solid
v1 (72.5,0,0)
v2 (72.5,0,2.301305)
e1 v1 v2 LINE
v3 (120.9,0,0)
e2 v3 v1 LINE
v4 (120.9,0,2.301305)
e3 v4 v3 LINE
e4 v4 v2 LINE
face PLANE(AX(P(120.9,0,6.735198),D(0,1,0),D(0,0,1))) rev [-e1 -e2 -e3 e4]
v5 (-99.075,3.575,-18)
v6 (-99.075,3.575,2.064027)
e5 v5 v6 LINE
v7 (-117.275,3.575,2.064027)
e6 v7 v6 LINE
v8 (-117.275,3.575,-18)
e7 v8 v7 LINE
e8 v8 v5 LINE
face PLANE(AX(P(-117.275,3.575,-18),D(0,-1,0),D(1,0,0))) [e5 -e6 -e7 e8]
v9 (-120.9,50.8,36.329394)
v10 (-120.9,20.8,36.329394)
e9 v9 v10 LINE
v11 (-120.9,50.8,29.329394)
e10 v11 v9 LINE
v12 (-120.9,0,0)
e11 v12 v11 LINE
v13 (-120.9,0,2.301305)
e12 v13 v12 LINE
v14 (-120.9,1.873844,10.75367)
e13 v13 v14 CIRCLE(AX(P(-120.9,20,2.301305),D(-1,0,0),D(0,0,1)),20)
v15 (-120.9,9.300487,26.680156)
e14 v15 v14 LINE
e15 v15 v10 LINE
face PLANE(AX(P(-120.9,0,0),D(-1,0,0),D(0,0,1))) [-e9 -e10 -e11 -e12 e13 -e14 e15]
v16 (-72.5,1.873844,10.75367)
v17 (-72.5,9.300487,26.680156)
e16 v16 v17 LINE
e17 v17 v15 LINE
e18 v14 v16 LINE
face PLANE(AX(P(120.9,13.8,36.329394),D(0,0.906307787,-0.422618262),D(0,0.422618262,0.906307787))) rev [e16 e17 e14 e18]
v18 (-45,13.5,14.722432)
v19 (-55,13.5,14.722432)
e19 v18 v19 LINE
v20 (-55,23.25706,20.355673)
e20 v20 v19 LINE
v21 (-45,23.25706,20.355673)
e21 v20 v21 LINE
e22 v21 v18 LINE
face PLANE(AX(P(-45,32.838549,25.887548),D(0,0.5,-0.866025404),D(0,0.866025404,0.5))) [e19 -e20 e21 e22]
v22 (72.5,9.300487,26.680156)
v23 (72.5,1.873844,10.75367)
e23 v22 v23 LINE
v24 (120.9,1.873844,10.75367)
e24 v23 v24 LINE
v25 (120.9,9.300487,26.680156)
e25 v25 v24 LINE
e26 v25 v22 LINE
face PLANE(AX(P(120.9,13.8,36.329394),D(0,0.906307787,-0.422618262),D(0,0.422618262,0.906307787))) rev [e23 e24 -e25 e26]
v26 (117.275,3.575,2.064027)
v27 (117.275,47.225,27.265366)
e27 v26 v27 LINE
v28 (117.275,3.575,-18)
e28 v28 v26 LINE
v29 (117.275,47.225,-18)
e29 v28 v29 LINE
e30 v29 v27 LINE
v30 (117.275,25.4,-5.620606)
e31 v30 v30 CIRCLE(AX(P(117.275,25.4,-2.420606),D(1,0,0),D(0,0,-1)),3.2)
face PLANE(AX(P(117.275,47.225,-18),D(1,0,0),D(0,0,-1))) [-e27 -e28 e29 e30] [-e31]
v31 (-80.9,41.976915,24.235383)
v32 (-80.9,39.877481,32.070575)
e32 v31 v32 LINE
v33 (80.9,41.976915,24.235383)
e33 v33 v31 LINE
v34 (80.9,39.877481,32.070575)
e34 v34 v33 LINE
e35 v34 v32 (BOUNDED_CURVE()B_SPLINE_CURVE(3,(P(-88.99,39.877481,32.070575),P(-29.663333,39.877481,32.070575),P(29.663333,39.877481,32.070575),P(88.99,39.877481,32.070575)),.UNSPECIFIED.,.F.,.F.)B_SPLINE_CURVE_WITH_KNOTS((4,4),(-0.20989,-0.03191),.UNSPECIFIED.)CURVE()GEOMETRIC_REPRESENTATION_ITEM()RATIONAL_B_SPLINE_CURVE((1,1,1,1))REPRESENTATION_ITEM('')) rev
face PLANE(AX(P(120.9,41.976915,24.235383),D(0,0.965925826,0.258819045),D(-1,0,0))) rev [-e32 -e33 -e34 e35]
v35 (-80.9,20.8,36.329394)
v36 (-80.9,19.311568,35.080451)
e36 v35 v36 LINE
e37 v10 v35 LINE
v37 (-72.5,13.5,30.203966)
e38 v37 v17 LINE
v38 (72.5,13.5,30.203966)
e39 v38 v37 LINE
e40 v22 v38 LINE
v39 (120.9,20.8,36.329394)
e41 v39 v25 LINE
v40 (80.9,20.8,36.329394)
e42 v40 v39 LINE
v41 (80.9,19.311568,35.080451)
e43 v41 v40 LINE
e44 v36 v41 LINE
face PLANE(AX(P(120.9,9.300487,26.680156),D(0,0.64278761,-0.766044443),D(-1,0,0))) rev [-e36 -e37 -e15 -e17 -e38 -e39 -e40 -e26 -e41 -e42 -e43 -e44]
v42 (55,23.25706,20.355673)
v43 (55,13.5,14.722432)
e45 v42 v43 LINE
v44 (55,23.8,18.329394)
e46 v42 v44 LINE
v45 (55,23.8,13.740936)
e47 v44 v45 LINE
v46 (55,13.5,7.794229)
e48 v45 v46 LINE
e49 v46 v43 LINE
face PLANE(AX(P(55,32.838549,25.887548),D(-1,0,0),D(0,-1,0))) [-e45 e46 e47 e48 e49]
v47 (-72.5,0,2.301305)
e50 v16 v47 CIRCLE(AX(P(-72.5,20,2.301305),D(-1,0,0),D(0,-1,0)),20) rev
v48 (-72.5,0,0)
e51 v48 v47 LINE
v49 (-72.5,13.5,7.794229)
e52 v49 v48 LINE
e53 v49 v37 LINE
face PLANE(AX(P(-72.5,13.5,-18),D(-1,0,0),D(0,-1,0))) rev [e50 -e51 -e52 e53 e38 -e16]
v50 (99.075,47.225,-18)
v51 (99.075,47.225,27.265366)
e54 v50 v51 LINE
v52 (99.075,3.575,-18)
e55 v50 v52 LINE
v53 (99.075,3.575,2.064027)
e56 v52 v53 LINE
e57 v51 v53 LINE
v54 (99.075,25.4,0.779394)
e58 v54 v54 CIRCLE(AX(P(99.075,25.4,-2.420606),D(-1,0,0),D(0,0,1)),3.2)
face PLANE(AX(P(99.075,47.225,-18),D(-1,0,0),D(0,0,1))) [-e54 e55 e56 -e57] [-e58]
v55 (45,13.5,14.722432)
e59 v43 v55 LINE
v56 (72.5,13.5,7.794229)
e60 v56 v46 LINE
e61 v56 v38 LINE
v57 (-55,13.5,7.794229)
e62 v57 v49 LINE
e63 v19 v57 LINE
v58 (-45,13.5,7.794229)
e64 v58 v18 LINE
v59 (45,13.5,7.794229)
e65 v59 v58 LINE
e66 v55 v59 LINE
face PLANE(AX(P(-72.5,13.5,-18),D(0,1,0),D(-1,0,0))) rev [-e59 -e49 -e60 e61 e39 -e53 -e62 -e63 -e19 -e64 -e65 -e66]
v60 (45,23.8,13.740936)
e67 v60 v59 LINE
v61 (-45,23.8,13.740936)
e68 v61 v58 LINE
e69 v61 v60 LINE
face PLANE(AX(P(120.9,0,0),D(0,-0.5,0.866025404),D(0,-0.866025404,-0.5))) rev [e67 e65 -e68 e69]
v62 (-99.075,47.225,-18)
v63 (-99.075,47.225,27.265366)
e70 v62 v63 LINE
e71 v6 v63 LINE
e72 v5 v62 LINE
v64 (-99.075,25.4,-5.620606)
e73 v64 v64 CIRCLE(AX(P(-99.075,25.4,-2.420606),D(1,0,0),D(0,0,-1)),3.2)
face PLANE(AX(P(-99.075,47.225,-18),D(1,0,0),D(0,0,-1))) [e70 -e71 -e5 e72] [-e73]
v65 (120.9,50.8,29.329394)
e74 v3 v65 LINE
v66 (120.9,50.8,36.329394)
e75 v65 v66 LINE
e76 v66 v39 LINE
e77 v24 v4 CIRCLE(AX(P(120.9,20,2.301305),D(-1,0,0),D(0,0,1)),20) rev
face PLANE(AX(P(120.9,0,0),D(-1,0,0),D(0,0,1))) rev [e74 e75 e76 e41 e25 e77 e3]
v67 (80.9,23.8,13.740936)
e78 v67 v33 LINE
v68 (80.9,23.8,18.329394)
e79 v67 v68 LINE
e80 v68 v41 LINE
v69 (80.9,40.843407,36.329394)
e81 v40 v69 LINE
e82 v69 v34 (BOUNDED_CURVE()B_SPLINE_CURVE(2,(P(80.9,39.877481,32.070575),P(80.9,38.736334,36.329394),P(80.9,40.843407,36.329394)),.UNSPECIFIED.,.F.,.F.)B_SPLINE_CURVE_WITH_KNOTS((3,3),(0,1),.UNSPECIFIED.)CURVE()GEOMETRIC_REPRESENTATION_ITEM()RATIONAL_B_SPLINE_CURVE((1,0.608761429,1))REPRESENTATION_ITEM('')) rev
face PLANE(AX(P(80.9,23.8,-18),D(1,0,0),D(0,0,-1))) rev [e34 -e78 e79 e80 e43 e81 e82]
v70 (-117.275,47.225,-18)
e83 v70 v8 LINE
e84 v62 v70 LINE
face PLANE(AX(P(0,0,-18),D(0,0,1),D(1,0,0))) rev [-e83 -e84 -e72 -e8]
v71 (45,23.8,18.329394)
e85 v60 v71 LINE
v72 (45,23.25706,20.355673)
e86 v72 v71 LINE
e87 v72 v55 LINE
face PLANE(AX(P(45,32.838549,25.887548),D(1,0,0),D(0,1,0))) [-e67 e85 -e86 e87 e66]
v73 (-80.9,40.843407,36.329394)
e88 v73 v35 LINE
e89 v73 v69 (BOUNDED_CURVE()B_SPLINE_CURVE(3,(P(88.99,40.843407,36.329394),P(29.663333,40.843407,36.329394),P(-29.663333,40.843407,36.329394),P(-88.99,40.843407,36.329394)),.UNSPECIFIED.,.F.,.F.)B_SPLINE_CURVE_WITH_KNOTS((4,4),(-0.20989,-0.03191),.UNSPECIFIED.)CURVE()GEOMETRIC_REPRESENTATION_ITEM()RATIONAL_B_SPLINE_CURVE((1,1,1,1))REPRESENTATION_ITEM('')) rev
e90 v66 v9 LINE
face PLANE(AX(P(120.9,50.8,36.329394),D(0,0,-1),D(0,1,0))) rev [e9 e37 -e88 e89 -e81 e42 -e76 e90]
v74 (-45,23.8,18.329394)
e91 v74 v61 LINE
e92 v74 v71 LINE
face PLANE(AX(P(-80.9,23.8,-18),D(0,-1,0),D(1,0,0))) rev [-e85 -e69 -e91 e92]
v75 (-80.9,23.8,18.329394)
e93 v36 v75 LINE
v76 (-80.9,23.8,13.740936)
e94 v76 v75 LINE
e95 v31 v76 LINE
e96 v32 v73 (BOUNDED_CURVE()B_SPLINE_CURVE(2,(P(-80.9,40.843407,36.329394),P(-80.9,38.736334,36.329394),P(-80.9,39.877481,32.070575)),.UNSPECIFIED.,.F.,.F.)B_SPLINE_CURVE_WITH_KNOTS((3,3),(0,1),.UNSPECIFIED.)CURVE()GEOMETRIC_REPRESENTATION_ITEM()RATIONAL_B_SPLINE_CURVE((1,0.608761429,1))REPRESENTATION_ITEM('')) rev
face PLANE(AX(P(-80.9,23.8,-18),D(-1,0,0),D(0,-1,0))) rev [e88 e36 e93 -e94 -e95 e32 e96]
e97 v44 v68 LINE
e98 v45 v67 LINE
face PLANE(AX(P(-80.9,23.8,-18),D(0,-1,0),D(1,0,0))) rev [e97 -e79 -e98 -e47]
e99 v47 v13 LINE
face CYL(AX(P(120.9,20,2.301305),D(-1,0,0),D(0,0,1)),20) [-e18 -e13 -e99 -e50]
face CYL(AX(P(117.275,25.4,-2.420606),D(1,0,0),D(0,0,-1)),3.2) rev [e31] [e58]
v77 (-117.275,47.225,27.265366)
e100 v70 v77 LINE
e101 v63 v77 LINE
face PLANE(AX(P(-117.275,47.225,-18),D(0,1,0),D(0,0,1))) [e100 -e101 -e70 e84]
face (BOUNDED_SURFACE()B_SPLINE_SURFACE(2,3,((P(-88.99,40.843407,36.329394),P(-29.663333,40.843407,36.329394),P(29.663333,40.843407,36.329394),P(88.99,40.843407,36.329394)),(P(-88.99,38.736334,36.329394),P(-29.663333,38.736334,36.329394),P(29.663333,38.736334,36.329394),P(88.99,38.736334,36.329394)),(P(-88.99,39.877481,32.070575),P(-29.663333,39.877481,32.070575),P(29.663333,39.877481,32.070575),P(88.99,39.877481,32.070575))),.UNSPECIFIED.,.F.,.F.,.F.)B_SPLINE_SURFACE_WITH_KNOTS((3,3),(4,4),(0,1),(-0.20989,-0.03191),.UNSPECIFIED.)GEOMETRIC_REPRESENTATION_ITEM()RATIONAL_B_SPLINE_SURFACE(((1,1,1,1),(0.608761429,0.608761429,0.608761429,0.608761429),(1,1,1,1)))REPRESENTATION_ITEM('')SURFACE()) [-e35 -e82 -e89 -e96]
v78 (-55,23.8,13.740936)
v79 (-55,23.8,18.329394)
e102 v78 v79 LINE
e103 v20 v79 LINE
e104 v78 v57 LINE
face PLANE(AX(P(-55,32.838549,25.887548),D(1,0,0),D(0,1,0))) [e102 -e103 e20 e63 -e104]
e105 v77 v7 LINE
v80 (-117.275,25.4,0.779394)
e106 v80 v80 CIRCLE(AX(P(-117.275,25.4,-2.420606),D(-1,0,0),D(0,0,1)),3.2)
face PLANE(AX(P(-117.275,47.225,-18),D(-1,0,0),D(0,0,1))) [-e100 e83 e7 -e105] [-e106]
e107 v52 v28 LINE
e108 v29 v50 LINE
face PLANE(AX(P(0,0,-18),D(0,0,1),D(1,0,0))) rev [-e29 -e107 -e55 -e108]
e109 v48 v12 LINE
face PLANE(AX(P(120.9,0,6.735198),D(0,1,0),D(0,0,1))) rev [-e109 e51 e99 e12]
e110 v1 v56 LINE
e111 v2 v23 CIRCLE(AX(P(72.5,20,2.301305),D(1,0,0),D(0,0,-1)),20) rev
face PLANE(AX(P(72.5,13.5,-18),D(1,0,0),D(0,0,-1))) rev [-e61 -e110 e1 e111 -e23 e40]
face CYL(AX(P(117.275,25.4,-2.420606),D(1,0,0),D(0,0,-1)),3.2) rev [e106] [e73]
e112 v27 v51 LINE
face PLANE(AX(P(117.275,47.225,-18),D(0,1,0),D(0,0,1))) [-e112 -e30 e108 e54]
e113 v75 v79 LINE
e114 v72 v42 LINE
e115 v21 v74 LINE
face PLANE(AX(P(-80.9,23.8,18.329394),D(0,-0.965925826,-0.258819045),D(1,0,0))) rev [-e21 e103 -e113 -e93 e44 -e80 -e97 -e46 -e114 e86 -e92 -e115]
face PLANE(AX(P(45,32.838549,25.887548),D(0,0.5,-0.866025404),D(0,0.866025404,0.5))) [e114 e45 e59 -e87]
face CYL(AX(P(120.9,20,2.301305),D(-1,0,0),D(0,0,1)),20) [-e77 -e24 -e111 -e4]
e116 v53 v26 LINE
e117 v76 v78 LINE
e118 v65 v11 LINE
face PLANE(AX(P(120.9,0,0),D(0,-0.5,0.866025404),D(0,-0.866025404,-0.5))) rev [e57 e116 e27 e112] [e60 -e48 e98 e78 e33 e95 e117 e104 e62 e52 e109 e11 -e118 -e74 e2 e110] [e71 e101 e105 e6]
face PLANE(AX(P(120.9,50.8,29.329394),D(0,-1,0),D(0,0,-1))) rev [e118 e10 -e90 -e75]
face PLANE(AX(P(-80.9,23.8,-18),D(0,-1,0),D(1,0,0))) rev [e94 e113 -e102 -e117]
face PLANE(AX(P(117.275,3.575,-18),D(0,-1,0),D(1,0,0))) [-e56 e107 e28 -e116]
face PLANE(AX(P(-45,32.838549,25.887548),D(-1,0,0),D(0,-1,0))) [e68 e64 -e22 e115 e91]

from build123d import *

# Parameters (mm, degrees)
BOSS_EXTRUDE2_DEPTH             = 120.9
BOSS_EXTRUDE1_REACH             = 138.078
SKETCH2_W                       = 18.2
SKETCH2_H                       = 43.65
BOSS_EXTRUDE1_DIRECTION_2_DEPTH = 18
M6_CLEARANCE_HOLE1_D            = 6.4
CUT_EXTRUDE6_DEPTH              = 137.078193862
CUT_EXTRUDE6_DEPTH_BACK         = 137.078193862
SKETCH13_W                      = 145
SKETCH13_H                      = 13.5
SKETCH13_W_2                    = 161.8
SKETCH13_H_2                    = 14
CHAMFER5_SIZE                   = 4.823085464
CHAMFER5_SIZE_2                 = 18
CHAMFER6_SIZE                   = 18
CHAMFER6_SIZE2                  = 4.823085464
CHAMFER7_SIZE                   = 7
CHAMFER7_SIZE_2                 = 10.646755418
CUT_EXTRUDE8_REACH              = 131.701
SKETCH15_W                      = 10
SKETCH15_H                      = 6
FILLET2_R                       = 20


with BuildPart() as part:
    # Sketch1 → Boss-Extrude2 (new, symmetric)
    with BuildSketch(Plane(origin=(0, 0, 0), x_dir=(0, 0, -1), z_dir=(1, 0, 0))):
        Polygon((0, 0), (-29.329393675, 50.8), (-36.329393675, 50.8), (-36.329393675, 13.8), (-6.735198172, 0), align=None)
    extrude(amount=BOSS_EXTRUDE2_DEPTH, both=True)

    # Boss-Extrude1: up to this plane
    boss_extrude1_end = Plane(origin=(120.9, 0, 0), z_dir=(0, -0.5000000000000043, 0.8660254037844363))
    # Sketch2 → Boss-Extrude1 (add, up to the surface)
    with BuildSketch(Plane.XY, mode=Mode.PRIVATE) as boss_extrude1_sk1:
        with Locations((108.175, 25.4)):
            Rectangle(SKETCH2_W, SKETCH2_H)
    boss_extrude1_tool1 = split(extrude(boss_extrude1_sk1.sketch, amount=BOSS_EXTRUDE1_REACH, mode=Mode.PRIVATE), bisect_by=boss_extrude1_end, keep=Keep.BOTH, mode=Mode.PRIVATE)
    add(boss_extrude1_tool1.solids().sort_by_distance((108.175, 25.4, 0))[0])
    # Sketch2 → Boss-Extrude1 (add, up to the surface)
    with BuildSketch(Plane.XY, mode=Mode.PRIVATE) as boss_extrude1_sk2:
        with Locations((-108.175, 25.4)):
            Rectangle(SKETCH2_W, SKETCH2_H)
    boss_extrude1_tool2 = split(extrude(boss_extrude1_sk2.sketch, amount=BOSS_EXTRUDE1_REACH, mode=Mode.PRIVATE), bisect_by=boss_extrude1_end, keep=Keep.BOTH, mode=Mode.PRIVATE)
    add(boss_extrude1_tool2.solids().sort_by_distance((-108.175, 25.4, 0))[0])

    # Sketch2 → Boss-Extrude1 direction 2 (add)
    with BuildSketch(Plane.XY):
        with Locations((108.175, 25.4)):
            Rectangle(SKETCH2_W, SKETCH2_H)
        with Locations((-108.175, 25.4)):
            Rectangle(SKETCH2_W, SKETCH2_H)
    extrude(amount=-BOSS_EXTRUDE1_DIRECTION_2_DEPTH)

    # M6 Clearance Hole1 (through all)
    with Locations(Plane(origin=(117.275, 0, 0), x_dir=(0, 0, -1), z_dir=(1, 0, 0))):
        with Locations((2.420606325, 25.4)):
            Hole(M6_CLEARANCE_HOLE1_D / 2)

    # Sketch13 → Cut-Extrude6 (cut, two sides: drawn at the far end of the back side and taken through both)
    with BuildSketch(Plane.XY.offset(-CUT_EXTRUDE6_DEPTH_BACK)):
        with Locations((0, 6.75)):
            Rectangle(SKETCH13_W, SKETCH13_H)
        with Locations((0, 30.8)):
            Rectangle(SKETCH13_W_2, SKETCH13_H_2)
    extrude(amount=CUT_EXTRUDE6_DEPTH + CUT_EXTRUDE6_DEPTH_BACK, mode=Mode.SUBTRACT)

    # Chamfer5
    # the kernel refuses this chamfer: 18, 4.823085464 mm, written as the material it takes off along each edge
    with BuildSketch(Plane(origin=(80.9, 37.8, 21.823840175), x_dir=(0, 0.9306108519370808, 0.366010166876469), z_dir=(-1, 0, 0))) as chamfer5_piece_1:
        Polygon((CHAMFER5_SIZE * 0.988937722204, -CHAMFER5_SIZE * 0.148331323403), (CHAMFER5_SIZE_2 * 0.366010166876, -CHAMFER5_SIZE_2 * 0.930610851937), (0, 0), align=None)
    extrude(amount=161.8, mode=Mode.SUBTRACT)

    # Chamfer6
    chamfer6_edges = [part.edges().sort_by_distance(p)[0] for p in [
        (0, 23.8, 36.329393675),
    ]]
    chamfer6_side = [part.faces().sort_by_distance(p)[0] for p in [
        (0, 23.8, 25.035165041),
    ]]
    chamfer(chamfer6_edges, length=CHAMFER6_SIZE, length2=CHAMFER6_SIZE2, reference=chamfer6_side[0])

    # Chamfer7
    # the kernel refuses this chamfer: 10.646755418, 7 mm, written as the material it takes off along each edge
    with BuildSketch(Plane(origin=(148.485482138, 13.8, 36.329393675), x_dir=(0, 0.9993026620124821, 0.037338849671180216), z_dir=(-1, 0, 0))) as chamfer7_piece_1:
        Polygon((CHAMFER7_SIZE * 0.999302662012, CHAMFER7_SIZE * 0.0373388496712), (-CHAMFER7_SIZE_2 * 0.456164044176, CHAMFER7_SIZE_2 * 0.88989570442), (0, 0), align=None)
    extrude(amount=296.970964275, mode=Mode.SUBTRACT)

    # Cut-Extrude8: up to this plane
    cut_extrude8_end = Plane(origin=(-80.9, 23.8, 18.329393675), z_dir=(0, -0.965925826289069, -0.25881904510251824))
    # Sketch15 → Cut-Extrude8 (cut, up to the surface)
    with BuildSketch(Plane(origin=(0, 13.5, 7.794228634), x_dir=(-1, 0, 0), z_dir=(0, 0.8660254037844363, 0.5000000000000042)), mode=Mode.PRIVATE) as cut_extrude8_sk1:
        with Locations((-50, 3)):
            Rectangle(SKETCH15_W, SKETCH15_H)
    cut_extrude8_tool1 = split(extrude(cut_extrude8_sk1.sketch, amount=CUT_EXTRUDE8_REACH, mode=Mode.PRIVATE), bisect_by=cut_extrude8_end, keep=Keep.BOTH, mode=Mode.PRIVATE)
    add(cut_extrude8_tool1.solids().sort_by_distance((50, 12, 10.392305))[0], mode=Mode.SUBTRACT)
    # Sketch15 → Cut-Extrude8 (cut, up to the surface)
    with BuildSketch(Plane(origin=(0, 13.5, 7.794228634), x_dir=(-1, 0, 0), z_dir=(0, 0.8660254037844363, 0.5000000000000042)), mode=Mode.PRIVATE) as cut_extrude8_sk2:
        with Locations((50, 3)):
            Rectangle(SKETCH15_W, SKETCH15_H)
    cut_extrude8_tool2 = split(extrude(cut_extrude8_sk2.sketch, amount=CUT_EXTRUDE8_REACH, mode=Mode.PRIVATE), bisect_by=cut_extrude8_end, keep=Keep.BOTH, mode=Mode.PRIVATE)
    add(cut_extrude8_tool2.solids().sort_by_distance((-50, 12, 10.392305))[0], mode=Mode.SUBTRACT)

    # Fillet1
    # an asymmetric fillet: 4, 1 mm, written as the material it takes off along each edge
    with BuildSketch(Plane(origin=(80.9, 38.736334118, 36.329393675), x_dir=(0, 1, 0), z_dir=(-1, 0, 0))) as fillet1_piece_1:
        with BuildLine():
            Bezier((2.10707295, 0), (0, 0), (1.141147124, 4.258819045), weights=[1, 0.608761429, 1])
            Line((1.141147124, 4.258819045), (0, 0))
            Line((0, 0), (2.10707295, 0))
        make_face()
    extrude(amount=161.8, mode=Mode.SUBTRACT)

    # Fillet2
    fillet2_edges = [part.edges().sort_by_distance(p)[0] for p in [
        (-96.7, 0, 6.735198172),
        (96.7, 0, 6.735198172),
    ]]
    fillet(fillet2_edges, radius=FILLET2_R)


solid = part.part
